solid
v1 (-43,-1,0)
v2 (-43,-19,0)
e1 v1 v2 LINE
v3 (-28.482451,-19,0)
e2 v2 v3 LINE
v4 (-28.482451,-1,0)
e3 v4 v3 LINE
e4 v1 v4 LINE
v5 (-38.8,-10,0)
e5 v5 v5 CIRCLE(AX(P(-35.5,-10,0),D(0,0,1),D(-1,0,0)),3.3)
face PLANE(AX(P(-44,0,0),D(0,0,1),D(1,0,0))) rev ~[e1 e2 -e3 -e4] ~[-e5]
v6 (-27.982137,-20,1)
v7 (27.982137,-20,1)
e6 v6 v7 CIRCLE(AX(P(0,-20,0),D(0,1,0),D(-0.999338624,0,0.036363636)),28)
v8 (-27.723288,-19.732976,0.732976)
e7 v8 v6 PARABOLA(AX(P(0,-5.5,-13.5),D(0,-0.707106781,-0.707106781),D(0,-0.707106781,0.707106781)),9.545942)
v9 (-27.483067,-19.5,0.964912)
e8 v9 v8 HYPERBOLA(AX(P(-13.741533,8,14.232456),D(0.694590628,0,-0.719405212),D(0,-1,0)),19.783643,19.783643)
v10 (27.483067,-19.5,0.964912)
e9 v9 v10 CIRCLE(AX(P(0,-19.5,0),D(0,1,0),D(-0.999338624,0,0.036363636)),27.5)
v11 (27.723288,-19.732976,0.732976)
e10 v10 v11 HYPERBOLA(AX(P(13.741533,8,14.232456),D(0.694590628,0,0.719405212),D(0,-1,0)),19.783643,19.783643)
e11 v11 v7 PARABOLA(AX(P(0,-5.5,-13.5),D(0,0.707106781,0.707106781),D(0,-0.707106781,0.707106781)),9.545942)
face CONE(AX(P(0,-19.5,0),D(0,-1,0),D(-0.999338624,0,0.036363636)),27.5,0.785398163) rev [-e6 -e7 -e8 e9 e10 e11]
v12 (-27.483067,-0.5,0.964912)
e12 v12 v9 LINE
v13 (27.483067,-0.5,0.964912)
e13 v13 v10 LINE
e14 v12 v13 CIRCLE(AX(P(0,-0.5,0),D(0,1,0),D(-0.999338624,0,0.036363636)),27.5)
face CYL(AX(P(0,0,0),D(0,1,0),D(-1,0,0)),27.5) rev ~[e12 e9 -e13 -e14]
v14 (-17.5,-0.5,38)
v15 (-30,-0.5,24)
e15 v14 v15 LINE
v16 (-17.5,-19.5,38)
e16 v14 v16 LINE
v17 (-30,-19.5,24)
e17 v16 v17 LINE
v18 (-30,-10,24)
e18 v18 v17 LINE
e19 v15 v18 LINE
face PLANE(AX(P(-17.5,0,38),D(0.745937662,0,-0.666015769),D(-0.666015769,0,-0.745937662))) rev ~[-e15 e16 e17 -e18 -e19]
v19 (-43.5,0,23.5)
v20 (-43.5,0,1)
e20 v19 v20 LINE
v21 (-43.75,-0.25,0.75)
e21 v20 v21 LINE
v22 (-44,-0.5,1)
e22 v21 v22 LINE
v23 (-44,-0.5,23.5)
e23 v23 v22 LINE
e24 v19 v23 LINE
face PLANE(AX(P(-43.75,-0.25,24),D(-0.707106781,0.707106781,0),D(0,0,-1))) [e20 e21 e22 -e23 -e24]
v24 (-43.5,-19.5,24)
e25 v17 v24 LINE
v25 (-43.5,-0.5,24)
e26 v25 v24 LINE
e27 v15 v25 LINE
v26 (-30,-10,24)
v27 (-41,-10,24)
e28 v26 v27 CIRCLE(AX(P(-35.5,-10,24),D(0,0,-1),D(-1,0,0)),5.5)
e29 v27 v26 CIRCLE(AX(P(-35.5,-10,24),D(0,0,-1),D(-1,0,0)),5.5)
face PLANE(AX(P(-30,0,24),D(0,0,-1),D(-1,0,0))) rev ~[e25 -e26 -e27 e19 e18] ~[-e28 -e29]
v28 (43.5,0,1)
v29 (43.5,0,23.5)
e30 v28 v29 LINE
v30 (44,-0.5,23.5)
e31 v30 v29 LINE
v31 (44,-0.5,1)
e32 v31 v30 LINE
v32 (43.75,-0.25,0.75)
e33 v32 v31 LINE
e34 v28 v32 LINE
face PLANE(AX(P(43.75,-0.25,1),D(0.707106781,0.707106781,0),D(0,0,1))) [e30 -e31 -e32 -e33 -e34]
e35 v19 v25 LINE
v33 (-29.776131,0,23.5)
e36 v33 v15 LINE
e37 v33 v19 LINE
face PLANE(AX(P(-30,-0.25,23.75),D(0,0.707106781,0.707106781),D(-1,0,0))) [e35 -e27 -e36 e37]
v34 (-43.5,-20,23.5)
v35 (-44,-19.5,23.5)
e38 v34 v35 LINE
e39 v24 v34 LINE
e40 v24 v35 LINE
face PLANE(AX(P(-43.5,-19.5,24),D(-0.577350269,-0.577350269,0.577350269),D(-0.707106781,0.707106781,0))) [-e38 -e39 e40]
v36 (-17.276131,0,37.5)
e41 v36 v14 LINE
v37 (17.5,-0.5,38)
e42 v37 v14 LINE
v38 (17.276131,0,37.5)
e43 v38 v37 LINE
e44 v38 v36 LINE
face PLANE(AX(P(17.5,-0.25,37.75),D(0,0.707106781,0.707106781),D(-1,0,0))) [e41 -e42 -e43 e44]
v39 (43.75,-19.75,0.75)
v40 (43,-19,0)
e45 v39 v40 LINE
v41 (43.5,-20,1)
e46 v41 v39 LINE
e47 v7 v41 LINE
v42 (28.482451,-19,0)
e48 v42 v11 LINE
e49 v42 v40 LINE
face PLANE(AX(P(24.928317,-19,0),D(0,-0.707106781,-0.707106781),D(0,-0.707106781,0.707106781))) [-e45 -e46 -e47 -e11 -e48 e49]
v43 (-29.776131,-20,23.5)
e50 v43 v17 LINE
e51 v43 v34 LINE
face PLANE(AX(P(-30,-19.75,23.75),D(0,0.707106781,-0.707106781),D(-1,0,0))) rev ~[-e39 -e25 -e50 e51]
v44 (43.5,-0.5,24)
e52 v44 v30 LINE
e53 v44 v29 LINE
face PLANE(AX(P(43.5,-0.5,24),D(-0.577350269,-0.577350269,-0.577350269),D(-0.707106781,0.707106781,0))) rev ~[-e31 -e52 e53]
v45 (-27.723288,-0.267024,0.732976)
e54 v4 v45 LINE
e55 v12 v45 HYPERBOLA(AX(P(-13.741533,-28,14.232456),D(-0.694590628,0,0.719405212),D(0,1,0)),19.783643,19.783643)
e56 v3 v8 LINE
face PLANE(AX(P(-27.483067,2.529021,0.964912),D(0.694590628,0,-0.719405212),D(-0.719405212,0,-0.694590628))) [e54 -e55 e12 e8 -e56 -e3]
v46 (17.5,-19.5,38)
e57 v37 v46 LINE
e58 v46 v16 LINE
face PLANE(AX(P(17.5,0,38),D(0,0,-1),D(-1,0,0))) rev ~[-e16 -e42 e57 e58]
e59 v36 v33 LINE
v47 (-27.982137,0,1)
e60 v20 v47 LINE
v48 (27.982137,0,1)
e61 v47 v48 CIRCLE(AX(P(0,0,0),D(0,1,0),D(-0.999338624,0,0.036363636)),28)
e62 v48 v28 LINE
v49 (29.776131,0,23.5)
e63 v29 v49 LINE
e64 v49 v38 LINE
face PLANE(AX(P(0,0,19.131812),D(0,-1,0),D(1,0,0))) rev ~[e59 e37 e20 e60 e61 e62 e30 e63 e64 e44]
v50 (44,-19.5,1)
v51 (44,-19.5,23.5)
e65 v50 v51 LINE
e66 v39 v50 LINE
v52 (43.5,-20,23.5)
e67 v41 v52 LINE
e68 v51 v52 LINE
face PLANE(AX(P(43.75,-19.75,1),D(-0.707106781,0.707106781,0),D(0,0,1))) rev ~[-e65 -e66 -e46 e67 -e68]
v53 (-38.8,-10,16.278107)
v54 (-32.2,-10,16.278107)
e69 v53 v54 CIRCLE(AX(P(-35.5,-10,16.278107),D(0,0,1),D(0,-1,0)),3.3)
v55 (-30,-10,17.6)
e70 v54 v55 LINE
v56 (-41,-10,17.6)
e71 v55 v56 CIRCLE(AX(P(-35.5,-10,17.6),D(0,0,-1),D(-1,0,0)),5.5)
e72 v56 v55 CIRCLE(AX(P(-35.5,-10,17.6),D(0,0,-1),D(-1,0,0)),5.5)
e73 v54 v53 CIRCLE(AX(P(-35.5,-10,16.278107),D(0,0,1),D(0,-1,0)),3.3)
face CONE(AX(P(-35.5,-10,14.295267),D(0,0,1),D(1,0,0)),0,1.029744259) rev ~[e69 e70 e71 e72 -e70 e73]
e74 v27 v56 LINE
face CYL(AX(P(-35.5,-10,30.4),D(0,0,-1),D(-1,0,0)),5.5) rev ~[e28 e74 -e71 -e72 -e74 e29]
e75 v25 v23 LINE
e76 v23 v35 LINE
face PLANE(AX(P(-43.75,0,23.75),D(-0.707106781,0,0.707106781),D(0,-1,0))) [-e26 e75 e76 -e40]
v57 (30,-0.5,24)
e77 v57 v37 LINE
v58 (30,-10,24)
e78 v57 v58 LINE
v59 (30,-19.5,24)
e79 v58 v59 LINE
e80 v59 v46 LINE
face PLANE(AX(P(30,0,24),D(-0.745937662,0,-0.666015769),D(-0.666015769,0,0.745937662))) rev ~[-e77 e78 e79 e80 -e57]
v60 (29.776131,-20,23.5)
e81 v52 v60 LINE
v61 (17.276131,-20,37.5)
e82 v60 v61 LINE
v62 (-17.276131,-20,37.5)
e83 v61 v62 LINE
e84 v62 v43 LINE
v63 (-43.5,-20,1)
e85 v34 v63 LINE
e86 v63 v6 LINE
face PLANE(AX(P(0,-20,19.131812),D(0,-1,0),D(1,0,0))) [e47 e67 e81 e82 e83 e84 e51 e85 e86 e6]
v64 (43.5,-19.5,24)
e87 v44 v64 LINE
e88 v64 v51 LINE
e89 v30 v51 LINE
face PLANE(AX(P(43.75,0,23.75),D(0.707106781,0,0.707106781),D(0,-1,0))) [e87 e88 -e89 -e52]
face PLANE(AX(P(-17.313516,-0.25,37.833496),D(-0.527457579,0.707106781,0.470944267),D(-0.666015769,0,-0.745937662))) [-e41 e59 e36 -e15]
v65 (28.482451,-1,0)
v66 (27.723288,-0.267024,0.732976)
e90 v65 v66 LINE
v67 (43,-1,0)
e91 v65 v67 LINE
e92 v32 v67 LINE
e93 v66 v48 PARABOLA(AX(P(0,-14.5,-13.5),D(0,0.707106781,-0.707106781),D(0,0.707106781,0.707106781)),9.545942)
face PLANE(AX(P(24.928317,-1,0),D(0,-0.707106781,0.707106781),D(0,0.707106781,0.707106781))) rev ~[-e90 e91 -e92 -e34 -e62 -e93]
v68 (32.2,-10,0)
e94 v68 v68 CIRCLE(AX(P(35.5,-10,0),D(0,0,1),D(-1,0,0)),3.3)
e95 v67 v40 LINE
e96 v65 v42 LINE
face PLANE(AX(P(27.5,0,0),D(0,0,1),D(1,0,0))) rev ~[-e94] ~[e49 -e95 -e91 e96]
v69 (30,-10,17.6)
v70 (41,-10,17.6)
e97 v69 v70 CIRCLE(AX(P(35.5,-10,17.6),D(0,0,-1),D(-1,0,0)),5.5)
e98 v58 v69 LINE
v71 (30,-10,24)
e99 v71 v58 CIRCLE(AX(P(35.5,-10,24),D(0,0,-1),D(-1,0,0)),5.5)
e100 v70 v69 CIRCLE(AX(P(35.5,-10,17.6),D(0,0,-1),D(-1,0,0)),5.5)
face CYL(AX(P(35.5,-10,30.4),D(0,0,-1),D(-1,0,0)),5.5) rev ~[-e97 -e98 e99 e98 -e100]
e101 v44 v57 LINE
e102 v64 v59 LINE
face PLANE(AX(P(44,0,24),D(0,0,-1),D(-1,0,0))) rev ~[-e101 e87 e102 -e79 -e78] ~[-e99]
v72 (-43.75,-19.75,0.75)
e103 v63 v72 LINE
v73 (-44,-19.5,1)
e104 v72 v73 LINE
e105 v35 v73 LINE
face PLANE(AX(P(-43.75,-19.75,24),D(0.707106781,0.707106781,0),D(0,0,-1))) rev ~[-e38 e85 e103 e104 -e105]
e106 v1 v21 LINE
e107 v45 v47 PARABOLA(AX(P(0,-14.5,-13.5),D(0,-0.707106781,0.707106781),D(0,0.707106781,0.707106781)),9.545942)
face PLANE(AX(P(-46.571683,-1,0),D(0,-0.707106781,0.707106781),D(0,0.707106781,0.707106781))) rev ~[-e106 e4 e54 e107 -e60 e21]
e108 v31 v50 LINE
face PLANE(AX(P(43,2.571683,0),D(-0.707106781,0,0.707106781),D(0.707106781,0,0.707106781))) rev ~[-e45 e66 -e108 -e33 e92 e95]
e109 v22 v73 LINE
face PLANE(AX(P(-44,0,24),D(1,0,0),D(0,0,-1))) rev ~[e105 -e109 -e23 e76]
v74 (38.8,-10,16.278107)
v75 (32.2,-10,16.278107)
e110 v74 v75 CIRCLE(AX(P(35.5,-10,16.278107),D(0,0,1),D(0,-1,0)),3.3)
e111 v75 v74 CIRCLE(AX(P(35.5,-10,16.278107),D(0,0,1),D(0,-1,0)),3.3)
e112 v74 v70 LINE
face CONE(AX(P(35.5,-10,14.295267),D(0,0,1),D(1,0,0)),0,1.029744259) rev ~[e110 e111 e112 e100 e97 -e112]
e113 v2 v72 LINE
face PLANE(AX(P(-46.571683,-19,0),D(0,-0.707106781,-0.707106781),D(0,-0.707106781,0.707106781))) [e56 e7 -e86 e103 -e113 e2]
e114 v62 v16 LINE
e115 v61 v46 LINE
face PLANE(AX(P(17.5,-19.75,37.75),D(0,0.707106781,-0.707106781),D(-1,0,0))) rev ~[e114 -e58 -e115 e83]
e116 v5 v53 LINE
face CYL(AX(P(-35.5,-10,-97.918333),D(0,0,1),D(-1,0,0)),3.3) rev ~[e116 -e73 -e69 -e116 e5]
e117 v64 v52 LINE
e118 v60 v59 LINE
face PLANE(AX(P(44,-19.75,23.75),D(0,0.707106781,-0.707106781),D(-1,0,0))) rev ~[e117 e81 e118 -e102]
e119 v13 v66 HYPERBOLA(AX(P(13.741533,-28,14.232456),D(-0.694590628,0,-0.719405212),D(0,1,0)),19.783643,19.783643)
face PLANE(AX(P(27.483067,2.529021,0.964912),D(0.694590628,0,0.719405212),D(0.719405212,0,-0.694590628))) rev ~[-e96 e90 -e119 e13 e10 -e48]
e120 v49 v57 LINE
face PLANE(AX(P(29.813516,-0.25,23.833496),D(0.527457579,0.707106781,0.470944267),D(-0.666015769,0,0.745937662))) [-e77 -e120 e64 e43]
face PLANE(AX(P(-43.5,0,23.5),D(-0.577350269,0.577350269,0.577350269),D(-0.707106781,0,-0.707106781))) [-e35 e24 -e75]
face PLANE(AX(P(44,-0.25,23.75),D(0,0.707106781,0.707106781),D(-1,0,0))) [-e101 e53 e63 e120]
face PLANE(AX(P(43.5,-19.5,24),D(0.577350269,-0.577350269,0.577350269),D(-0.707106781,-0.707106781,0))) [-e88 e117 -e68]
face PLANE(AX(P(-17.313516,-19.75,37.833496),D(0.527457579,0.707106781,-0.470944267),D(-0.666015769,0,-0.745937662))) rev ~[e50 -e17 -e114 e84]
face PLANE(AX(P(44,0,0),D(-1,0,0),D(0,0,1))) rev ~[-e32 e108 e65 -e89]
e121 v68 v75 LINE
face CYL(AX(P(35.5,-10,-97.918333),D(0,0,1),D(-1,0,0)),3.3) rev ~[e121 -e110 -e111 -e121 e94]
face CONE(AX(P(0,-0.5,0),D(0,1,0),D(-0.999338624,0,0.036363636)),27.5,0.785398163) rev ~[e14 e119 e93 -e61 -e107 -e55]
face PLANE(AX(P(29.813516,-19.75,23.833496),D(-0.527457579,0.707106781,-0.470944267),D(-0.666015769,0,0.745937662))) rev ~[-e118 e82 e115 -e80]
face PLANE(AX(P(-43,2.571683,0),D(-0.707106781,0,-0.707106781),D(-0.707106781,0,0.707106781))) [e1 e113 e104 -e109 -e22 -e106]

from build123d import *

# Parameters (mm, degrees)
F1_DEPTH    = 20
F3_D        = 6.6
F5_D        = 11
F5_DEPTH    = 6.4
F5_TIP      = 3.3047334047
F7_D        = 11
F7_DEPTH    = 6.4
F7_TIP      = 3.3047334047
F8_T1_DEPTH = 21.6433659759
F8_T3_DEPTH = 25.1433659759
F8_T5_DEPTH = 21.6433659759
F8_T7_DEPTH = 25.0580427678
F9_SIZE     = 0.5


# Not quite as in the source:
# - a fillet or chamfer that OpenCascade refuses, or shapes differently, is made with other operations: its cross-section is extruded or revolved along the edge and cut away or added


with BuildPart() as f1:
    # F0 (on Front) → F1 (new body)
    with BuildSketch(Plane.XZ):
        with BuildLine():
            ThreePointArc((-27.5, 0), (0, 27.5), (27.5, 0))
            Line((27.5, 0), (44, 0))
            Line((44, 0), (44, 24))
            Line((44, 24), (30, 24))
            Line((30, 24), (17.5, 38))
            Line((17.5, 38), (-17.5, 38))
            Line((-17.5, 38), (-30, 24))
            Line((-30, 24), (-44, 24))
            Line((-44, 24), (-44, 0))
            Line((-44, 0), (-27.5, 0))
        make_face()
    extrude(amount=F1_DEPTH)

    # F3 (through all)
    with Locations(Plane(origin=(0, 0, 0), x_dir=(1, 0, 0), z_dir=(0, 0, -1))):
        with Locations((-35.5, 10), (35.5, 10)):
            Hole(F3_D / 2)

    # F5
    with Locations(Plane.XY.offset(24)):
        with Locations((-35.5, -10)):
            Hole(F5_D / 2, depth=F5_DEPTH)
            with Locations((0, 0, -(F5_DEPTH + F5_TIP / 2))):  # 118° drill point
                Cone(0, F5_D / 2, F5_TIP, mode=Mode.SUBTRACT)

    # F7
    with Locations(Plane.XY.offset(24)):
        with Locations((35.5, -10)):
            Hole(F7_D / 2, depth=F7_DEPTH)
            with Locations((0, 0, -(F7_DEPTH + F7_TIP / 2))):  # 118° drill point
                Cone(0, F7_D / 2, F7_TIP, mode=Mode.SUBTRACT)

    # F8: chamfer of 1 on 8 edges, made by hand

    # F8_s2 → F8_t1 (cut)
    with BuildSketch(Plane.YZ.offset(24.928317012)):
        Polygon((-19, 0), (-20, 1), (-20, 0), align=None)
        Polygon((-1, 0), (0, 1), (0, 0), align=None)
    extrude(amount=F8_T1_DEPTH, mode=Mode.SUBTRACT)

    # F8_s4 → F8_t3 (cut)
    with BuildSketch(Plane.XZ.offset(-2.571682988)):
        Polygon((43, 0), (44, 1), (44, 0), align=None)
        Polygon((-43, 0), (-44, 1), (-44, 0), align=None)
    extrude(amount=F8_T3_DEPTH, mode=Mode.SUBTRACT)

    # F8_s6 → F8_t5 (cut)
    with BuildSketch(Plane.YZ.offset(-46.571682988)):
        Polygon((-19, 0), (-20, 1), (-20, 0), align=None)
        Polygon((-1, 0), (0, 1), (0, 0), align=None)
    extrude(amount=F8_T5_DEPTH, mode=Mode.SUBTRACT)

    # F8_s8 → F8_t7 (cut)
    with BuildSketch(Plane.XZ.offset(-2.5290213839)):
        with BuildLine():
            Line((-27.4830665009, 0.9649122807), (-28.4824507373, 0))
            Line((-28.4824507373, 0), (-27.5, 0))
            ThreePointArc((-27.5, 0), (-27.4955143469, 0.4966797747), (-27.4830665009, 0.9649122807))
        make_face()
        with BuildLine():
            Line((27.4830665009, 0.9649122807), (28.4824507373, 0))
            Line((28.4824507373, 0), (27.5, 0))
            ThreePointArc((27.5, 0), (27.4955143469, 0.4966797747), (27.4830665009, 0.9649122807))
        make_face()
    extrude(amount=F8_T7_DEPTH, mode=Mode.SUBTRACT)

    # F9
    f9_edges = [f1.edges().sort_by_distance(p)[0] for p in [
        (44, -20, 12.5),
        (44, 0, 12.5),
        (44, -10, 24),
        (37, -20, 24),
        (37, 0, 24),
        (23.75, 0, 31),
        (23.75, -20, 31),
        (0, -20, 38),
        (0, 0, 38),
        (-23.75, -20, 31),
        (0, -20, 27.5),
        (-44, -20, 12.5),
        (-37, -20, 24),
        (-44, -10, 24),
        (-37, 0, 24),
        (0, 0, 27.5),
        (-23.75, 0, 31),
        (-44, 0, 12.5),
    ]]
    chamfer(f9_edges, length=F9_SIZE)


solid = f1.part
